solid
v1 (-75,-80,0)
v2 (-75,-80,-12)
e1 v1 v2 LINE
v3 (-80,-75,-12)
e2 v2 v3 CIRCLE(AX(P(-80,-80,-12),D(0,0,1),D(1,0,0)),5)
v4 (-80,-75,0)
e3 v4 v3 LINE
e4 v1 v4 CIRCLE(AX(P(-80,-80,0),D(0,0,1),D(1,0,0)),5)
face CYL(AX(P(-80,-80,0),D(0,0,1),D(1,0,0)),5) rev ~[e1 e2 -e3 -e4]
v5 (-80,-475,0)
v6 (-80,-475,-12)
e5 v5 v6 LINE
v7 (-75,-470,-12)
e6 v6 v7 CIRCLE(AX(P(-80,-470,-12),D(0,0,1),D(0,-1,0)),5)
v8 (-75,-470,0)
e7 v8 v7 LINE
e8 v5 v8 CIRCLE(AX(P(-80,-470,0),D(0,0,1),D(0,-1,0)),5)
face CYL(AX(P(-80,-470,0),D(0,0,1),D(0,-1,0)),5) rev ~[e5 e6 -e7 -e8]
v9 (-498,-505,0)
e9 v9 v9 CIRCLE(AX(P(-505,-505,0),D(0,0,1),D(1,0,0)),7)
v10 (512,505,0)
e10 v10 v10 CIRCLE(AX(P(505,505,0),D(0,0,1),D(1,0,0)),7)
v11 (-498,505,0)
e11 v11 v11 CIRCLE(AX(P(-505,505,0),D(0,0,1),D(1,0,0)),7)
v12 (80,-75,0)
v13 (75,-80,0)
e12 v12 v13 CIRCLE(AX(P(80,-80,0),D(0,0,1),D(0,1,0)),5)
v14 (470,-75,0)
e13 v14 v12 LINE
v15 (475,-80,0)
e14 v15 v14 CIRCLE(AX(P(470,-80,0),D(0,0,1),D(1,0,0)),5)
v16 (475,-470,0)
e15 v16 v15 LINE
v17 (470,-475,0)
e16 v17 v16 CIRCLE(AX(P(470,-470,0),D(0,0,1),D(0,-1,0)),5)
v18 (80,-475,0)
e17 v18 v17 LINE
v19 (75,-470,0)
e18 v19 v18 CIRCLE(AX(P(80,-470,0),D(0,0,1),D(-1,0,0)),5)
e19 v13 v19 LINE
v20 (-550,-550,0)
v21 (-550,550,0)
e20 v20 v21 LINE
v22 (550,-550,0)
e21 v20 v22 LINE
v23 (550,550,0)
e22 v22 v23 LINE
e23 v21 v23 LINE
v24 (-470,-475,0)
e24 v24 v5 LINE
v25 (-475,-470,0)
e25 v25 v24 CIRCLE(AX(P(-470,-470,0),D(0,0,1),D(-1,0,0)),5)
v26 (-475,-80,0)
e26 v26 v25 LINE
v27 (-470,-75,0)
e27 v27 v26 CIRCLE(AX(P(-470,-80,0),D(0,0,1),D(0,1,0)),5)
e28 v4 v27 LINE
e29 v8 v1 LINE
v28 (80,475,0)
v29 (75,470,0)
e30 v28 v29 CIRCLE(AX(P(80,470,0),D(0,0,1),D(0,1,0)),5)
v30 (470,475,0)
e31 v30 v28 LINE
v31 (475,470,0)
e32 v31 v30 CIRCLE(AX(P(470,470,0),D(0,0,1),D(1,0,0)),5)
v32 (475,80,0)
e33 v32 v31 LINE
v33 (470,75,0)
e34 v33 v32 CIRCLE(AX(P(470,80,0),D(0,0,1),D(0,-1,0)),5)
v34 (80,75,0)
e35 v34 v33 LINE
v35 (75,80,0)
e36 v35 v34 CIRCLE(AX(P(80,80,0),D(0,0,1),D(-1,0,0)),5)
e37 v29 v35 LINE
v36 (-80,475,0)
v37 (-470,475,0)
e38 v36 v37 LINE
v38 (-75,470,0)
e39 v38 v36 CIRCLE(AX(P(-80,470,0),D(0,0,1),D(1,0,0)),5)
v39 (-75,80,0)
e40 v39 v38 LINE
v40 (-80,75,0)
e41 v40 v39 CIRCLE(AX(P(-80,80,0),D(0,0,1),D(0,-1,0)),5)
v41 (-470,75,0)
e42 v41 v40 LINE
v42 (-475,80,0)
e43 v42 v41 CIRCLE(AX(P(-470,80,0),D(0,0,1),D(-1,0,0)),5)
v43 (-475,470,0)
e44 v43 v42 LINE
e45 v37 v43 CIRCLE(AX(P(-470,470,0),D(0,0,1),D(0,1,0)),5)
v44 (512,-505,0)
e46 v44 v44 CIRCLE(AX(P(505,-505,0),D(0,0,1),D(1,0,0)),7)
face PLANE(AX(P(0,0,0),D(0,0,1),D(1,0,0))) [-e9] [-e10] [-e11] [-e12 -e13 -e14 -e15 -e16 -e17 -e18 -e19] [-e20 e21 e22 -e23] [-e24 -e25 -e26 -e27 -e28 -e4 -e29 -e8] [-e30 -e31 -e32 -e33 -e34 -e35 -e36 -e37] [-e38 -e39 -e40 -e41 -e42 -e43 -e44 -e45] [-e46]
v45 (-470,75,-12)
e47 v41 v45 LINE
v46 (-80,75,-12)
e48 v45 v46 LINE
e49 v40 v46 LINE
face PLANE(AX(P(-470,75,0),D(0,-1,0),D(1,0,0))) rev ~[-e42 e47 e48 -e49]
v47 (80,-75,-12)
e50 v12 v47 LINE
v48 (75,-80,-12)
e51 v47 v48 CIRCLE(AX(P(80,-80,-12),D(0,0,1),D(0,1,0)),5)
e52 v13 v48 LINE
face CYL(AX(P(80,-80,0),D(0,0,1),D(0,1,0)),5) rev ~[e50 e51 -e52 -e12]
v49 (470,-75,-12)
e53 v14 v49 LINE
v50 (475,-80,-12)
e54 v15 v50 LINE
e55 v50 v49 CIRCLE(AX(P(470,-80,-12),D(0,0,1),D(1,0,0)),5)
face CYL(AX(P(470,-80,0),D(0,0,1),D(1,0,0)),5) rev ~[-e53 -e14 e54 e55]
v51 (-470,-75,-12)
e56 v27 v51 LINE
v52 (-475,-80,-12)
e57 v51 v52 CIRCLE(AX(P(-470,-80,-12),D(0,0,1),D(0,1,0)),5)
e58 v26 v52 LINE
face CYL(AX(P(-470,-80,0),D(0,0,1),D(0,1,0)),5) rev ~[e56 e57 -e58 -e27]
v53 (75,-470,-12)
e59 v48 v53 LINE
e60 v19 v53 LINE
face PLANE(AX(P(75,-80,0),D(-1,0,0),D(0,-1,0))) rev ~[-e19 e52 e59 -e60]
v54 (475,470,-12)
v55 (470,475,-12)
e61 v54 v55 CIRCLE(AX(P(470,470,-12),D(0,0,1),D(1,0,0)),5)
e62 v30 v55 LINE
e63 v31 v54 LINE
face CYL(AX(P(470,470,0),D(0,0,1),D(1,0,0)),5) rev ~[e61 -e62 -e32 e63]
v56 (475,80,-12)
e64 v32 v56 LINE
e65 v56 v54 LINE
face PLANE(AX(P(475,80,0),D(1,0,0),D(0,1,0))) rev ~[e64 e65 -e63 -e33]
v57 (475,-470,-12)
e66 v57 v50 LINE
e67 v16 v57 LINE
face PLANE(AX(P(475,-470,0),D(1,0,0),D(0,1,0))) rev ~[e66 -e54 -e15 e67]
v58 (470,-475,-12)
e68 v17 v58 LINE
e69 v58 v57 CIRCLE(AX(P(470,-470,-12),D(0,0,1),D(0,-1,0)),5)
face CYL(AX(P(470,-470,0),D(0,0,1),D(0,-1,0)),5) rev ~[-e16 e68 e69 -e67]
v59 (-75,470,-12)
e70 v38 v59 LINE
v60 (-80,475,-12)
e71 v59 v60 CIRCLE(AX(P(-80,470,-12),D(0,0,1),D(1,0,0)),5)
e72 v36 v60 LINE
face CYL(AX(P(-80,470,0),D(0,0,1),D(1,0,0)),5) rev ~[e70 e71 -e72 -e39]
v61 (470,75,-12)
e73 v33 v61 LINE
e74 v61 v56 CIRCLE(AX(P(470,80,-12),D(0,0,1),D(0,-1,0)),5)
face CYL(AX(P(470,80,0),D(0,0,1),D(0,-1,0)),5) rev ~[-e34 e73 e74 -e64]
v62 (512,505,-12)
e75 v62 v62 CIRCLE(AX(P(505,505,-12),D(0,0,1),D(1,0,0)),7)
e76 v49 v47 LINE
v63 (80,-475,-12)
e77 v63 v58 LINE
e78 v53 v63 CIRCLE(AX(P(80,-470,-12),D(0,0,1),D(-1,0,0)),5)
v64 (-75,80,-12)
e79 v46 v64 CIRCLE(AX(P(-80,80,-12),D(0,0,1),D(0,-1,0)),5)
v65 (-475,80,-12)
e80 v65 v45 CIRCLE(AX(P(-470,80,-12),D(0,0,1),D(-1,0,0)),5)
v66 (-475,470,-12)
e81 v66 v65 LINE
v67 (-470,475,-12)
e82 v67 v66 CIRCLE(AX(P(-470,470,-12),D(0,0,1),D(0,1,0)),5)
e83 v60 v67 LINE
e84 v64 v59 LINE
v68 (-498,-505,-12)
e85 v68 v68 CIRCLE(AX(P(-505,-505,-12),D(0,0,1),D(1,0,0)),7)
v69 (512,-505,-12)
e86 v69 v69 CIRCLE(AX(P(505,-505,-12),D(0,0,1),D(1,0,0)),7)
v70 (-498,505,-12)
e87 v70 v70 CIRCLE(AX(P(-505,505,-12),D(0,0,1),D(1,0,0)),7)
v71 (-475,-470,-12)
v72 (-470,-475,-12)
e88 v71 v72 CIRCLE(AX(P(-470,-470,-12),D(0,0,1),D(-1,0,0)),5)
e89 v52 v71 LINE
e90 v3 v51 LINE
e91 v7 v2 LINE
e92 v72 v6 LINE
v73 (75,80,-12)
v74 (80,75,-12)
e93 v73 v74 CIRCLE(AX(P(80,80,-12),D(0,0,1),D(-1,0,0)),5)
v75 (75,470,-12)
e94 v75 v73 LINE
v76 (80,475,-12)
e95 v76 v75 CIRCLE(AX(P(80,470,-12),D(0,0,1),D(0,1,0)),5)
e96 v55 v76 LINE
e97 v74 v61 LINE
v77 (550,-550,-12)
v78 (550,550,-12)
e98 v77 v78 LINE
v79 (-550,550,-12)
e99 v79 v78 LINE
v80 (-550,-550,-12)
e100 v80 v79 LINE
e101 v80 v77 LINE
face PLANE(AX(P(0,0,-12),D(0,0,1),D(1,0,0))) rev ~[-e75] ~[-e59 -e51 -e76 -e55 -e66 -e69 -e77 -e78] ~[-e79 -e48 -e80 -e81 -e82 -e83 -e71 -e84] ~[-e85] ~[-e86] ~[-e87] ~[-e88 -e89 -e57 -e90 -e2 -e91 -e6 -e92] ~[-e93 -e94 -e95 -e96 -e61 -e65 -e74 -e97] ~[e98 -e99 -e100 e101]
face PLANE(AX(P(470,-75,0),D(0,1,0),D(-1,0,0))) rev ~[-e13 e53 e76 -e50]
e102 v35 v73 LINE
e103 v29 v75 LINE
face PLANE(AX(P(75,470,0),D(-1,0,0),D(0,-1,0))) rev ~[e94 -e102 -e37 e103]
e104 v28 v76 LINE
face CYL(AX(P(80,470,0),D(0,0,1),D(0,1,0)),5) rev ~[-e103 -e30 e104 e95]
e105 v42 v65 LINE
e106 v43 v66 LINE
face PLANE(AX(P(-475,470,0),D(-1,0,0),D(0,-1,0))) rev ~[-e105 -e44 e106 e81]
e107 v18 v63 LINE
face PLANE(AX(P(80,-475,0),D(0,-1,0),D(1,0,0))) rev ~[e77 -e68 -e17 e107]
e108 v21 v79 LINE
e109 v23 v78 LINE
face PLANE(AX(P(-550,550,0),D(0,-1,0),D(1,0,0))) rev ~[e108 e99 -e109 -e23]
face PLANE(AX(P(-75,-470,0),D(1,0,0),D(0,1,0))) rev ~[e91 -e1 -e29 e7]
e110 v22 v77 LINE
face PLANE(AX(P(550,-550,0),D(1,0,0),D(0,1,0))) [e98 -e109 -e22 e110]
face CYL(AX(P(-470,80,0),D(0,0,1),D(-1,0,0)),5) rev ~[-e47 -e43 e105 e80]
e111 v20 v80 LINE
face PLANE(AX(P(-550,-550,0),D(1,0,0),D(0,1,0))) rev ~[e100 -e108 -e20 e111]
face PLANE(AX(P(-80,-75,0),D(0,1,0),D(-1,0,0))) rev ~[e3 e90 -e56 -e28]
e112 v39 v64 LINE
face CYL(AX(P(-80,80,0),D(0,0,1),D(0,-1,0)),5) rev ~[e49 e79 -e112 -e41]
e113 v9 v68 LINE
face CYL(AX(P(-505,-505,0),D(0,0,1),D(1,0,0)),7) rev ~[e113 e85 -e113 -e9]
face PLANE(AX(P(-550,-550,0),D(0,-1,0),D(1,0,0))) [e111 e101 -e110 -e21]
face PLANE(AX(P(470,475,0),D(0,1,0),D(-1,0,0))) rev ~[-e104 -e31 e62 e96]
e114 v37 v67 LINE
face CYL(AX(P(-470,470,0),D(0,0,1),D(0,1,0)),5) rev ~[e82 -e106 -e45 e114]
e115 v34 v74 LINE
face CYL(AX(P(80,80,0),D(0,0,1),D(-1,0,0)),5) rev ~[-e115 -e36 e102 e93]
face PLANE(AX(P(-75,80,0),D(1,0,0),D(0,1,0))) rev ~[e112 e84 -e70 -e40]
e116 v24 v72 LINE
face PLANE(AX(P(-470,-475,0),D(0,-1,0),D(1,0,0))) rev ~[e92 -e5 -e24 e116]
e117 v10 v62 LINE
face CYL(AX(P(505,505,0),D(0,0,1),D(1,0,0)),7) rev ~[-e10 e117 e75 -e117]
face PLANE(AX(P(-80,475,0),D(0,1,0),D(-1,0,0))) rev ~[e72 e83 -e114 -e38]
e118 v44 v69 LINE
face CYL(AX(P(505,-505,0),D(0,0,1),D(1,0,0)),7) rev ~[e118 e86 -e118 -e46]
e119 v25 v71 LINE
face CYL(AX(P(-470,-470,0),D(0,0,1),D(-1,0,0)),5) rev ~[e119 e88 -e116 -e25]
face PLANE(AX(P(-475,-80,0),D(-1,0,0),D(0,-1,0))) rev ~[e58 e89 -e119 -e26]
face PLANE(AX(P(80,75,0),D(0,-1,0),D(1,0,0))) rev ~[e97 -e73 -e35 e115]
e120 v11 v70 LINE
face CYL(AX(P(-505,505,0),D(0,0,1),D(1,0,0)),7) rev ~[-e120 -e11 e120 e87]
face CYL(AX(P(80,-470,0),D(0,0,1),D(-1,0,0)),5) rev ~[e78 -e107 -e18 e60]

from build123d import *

# Parameters (mm, degrees)
F0_W     = 1100
F0_H     = 1100
F1_DEPTH = 12
F2_R     = 7
F3_DEPTH = 25
F5_DEPTH = 25


# Not quite as in the source:
# - a feature names something its author has since deleted; it is built from what else it names


with BuildPart() as f1:
    # F0 (on Top) → F1 (new body)
    with BuildSketch(Plane.XY):
        Rectangle(F0_W, F0_H)
    extrude(amount=-F1_DEPTH)

    # F2 (on Top) → F3 (cut)
    with BuildSketch(Plane.XY):
        with Locations((-505, -505)):
            Circle(F2_R)
        with Locations((505, 505)):
            Circle(F2_R)
        with Locations((-505, 505)):
            Circle(F2_R)
        with Locations((505, -505)):
            Circle(F2_R)
    extrude(amount=-F3_DEPTH, mode=Mode.SUBTRACT)

    # F4 (on Top) → F5 (cut)
    with BuildSketch(Plane.XY):
        with BuildLine():
            Line((-80, 475), (-470, 475))
            ThreePointArc((-470, 475), (-473.5355339059, 473.5355339059), (-475, 470))
            Line((-475, 470), (-475, 80))
            ThreePointArc((-475, 80), (-473.5355339059, 76.4644660941), (-470, 75))
            Line((-470, 75), (-80, 75))
            ThreePointArc((-80, 75), (-76.4644660941, 76.4644660941), (-75, 80))
            Line((-75, 80), (-75, 470))
            ThreePointArc((-75, 470), (-76.4644660941, 473.5355339059), (-80, 475))
        make_face()
        with BuildLine():
            ThreePointArc((80, 475), (76.4644660941, 473.5355339059), (75, 470))
            Line((75, 470), (75, 80))
            ThreePointArc((75, 80), (76.4644660941, 76.4644660941), (80, 75))
            Line((80, 75), (470, 75))
            ThreePointArc((470, 75), (473.5355339059, 76.4644660941), (475, 80))
            Line((475, 80), (475, 470))
            ThreePointArc((475, 470), (473.5355339059, 473.5355339059), (470, 475))
            Line((470, 475), (80, 475))
        make_face()
        with BuildLine():
            ThreePointArc((475, -80), (473.5355339059, -76.4644660941), (470, -75))
            Line((470, -75), (80, -75))
            ThreePointArc((80, -75), (76.4644660941, -76.4644660941), (75, -80))
            Line((75, -80), (75, -470))
            ThreePointArc((75, -470), (76.4644660941, -473.5355339059), (80, -475))
            Line((80, -475), (470, -475))
            ThreePointArc((470, -475), (473.5355339059, -473.5355339059), (475, -470))
            Line((475, -470), (475, -80))
        make_face()
        with BuildLine():
            ThreePointArc((-475, -470), (-473.5355339059, -473.5355339059), (-470, -475))
            Line((-470, -475), (-80, -475))
            ThreePointArc((-80, -475), (-76.4644660941, -473.5355339059), (-75, -470))
            Line((-75, -470), (-75, -80))
            ThreePointArc((-75, -80), (-76.4644660941, -76.4644660941), (-80, -75))
            Line((-80, -75), (-470, -75))
            ThreePointArc((-470, -75), (-473.5355339059, -76.4644660941), (-475, -80))
            Line((-475, -80), (-475, -470))
        make_face()
    extrude(amount=-F5_DEPTH, mode=Mode.SUBTRACT)


solid = f1.part
